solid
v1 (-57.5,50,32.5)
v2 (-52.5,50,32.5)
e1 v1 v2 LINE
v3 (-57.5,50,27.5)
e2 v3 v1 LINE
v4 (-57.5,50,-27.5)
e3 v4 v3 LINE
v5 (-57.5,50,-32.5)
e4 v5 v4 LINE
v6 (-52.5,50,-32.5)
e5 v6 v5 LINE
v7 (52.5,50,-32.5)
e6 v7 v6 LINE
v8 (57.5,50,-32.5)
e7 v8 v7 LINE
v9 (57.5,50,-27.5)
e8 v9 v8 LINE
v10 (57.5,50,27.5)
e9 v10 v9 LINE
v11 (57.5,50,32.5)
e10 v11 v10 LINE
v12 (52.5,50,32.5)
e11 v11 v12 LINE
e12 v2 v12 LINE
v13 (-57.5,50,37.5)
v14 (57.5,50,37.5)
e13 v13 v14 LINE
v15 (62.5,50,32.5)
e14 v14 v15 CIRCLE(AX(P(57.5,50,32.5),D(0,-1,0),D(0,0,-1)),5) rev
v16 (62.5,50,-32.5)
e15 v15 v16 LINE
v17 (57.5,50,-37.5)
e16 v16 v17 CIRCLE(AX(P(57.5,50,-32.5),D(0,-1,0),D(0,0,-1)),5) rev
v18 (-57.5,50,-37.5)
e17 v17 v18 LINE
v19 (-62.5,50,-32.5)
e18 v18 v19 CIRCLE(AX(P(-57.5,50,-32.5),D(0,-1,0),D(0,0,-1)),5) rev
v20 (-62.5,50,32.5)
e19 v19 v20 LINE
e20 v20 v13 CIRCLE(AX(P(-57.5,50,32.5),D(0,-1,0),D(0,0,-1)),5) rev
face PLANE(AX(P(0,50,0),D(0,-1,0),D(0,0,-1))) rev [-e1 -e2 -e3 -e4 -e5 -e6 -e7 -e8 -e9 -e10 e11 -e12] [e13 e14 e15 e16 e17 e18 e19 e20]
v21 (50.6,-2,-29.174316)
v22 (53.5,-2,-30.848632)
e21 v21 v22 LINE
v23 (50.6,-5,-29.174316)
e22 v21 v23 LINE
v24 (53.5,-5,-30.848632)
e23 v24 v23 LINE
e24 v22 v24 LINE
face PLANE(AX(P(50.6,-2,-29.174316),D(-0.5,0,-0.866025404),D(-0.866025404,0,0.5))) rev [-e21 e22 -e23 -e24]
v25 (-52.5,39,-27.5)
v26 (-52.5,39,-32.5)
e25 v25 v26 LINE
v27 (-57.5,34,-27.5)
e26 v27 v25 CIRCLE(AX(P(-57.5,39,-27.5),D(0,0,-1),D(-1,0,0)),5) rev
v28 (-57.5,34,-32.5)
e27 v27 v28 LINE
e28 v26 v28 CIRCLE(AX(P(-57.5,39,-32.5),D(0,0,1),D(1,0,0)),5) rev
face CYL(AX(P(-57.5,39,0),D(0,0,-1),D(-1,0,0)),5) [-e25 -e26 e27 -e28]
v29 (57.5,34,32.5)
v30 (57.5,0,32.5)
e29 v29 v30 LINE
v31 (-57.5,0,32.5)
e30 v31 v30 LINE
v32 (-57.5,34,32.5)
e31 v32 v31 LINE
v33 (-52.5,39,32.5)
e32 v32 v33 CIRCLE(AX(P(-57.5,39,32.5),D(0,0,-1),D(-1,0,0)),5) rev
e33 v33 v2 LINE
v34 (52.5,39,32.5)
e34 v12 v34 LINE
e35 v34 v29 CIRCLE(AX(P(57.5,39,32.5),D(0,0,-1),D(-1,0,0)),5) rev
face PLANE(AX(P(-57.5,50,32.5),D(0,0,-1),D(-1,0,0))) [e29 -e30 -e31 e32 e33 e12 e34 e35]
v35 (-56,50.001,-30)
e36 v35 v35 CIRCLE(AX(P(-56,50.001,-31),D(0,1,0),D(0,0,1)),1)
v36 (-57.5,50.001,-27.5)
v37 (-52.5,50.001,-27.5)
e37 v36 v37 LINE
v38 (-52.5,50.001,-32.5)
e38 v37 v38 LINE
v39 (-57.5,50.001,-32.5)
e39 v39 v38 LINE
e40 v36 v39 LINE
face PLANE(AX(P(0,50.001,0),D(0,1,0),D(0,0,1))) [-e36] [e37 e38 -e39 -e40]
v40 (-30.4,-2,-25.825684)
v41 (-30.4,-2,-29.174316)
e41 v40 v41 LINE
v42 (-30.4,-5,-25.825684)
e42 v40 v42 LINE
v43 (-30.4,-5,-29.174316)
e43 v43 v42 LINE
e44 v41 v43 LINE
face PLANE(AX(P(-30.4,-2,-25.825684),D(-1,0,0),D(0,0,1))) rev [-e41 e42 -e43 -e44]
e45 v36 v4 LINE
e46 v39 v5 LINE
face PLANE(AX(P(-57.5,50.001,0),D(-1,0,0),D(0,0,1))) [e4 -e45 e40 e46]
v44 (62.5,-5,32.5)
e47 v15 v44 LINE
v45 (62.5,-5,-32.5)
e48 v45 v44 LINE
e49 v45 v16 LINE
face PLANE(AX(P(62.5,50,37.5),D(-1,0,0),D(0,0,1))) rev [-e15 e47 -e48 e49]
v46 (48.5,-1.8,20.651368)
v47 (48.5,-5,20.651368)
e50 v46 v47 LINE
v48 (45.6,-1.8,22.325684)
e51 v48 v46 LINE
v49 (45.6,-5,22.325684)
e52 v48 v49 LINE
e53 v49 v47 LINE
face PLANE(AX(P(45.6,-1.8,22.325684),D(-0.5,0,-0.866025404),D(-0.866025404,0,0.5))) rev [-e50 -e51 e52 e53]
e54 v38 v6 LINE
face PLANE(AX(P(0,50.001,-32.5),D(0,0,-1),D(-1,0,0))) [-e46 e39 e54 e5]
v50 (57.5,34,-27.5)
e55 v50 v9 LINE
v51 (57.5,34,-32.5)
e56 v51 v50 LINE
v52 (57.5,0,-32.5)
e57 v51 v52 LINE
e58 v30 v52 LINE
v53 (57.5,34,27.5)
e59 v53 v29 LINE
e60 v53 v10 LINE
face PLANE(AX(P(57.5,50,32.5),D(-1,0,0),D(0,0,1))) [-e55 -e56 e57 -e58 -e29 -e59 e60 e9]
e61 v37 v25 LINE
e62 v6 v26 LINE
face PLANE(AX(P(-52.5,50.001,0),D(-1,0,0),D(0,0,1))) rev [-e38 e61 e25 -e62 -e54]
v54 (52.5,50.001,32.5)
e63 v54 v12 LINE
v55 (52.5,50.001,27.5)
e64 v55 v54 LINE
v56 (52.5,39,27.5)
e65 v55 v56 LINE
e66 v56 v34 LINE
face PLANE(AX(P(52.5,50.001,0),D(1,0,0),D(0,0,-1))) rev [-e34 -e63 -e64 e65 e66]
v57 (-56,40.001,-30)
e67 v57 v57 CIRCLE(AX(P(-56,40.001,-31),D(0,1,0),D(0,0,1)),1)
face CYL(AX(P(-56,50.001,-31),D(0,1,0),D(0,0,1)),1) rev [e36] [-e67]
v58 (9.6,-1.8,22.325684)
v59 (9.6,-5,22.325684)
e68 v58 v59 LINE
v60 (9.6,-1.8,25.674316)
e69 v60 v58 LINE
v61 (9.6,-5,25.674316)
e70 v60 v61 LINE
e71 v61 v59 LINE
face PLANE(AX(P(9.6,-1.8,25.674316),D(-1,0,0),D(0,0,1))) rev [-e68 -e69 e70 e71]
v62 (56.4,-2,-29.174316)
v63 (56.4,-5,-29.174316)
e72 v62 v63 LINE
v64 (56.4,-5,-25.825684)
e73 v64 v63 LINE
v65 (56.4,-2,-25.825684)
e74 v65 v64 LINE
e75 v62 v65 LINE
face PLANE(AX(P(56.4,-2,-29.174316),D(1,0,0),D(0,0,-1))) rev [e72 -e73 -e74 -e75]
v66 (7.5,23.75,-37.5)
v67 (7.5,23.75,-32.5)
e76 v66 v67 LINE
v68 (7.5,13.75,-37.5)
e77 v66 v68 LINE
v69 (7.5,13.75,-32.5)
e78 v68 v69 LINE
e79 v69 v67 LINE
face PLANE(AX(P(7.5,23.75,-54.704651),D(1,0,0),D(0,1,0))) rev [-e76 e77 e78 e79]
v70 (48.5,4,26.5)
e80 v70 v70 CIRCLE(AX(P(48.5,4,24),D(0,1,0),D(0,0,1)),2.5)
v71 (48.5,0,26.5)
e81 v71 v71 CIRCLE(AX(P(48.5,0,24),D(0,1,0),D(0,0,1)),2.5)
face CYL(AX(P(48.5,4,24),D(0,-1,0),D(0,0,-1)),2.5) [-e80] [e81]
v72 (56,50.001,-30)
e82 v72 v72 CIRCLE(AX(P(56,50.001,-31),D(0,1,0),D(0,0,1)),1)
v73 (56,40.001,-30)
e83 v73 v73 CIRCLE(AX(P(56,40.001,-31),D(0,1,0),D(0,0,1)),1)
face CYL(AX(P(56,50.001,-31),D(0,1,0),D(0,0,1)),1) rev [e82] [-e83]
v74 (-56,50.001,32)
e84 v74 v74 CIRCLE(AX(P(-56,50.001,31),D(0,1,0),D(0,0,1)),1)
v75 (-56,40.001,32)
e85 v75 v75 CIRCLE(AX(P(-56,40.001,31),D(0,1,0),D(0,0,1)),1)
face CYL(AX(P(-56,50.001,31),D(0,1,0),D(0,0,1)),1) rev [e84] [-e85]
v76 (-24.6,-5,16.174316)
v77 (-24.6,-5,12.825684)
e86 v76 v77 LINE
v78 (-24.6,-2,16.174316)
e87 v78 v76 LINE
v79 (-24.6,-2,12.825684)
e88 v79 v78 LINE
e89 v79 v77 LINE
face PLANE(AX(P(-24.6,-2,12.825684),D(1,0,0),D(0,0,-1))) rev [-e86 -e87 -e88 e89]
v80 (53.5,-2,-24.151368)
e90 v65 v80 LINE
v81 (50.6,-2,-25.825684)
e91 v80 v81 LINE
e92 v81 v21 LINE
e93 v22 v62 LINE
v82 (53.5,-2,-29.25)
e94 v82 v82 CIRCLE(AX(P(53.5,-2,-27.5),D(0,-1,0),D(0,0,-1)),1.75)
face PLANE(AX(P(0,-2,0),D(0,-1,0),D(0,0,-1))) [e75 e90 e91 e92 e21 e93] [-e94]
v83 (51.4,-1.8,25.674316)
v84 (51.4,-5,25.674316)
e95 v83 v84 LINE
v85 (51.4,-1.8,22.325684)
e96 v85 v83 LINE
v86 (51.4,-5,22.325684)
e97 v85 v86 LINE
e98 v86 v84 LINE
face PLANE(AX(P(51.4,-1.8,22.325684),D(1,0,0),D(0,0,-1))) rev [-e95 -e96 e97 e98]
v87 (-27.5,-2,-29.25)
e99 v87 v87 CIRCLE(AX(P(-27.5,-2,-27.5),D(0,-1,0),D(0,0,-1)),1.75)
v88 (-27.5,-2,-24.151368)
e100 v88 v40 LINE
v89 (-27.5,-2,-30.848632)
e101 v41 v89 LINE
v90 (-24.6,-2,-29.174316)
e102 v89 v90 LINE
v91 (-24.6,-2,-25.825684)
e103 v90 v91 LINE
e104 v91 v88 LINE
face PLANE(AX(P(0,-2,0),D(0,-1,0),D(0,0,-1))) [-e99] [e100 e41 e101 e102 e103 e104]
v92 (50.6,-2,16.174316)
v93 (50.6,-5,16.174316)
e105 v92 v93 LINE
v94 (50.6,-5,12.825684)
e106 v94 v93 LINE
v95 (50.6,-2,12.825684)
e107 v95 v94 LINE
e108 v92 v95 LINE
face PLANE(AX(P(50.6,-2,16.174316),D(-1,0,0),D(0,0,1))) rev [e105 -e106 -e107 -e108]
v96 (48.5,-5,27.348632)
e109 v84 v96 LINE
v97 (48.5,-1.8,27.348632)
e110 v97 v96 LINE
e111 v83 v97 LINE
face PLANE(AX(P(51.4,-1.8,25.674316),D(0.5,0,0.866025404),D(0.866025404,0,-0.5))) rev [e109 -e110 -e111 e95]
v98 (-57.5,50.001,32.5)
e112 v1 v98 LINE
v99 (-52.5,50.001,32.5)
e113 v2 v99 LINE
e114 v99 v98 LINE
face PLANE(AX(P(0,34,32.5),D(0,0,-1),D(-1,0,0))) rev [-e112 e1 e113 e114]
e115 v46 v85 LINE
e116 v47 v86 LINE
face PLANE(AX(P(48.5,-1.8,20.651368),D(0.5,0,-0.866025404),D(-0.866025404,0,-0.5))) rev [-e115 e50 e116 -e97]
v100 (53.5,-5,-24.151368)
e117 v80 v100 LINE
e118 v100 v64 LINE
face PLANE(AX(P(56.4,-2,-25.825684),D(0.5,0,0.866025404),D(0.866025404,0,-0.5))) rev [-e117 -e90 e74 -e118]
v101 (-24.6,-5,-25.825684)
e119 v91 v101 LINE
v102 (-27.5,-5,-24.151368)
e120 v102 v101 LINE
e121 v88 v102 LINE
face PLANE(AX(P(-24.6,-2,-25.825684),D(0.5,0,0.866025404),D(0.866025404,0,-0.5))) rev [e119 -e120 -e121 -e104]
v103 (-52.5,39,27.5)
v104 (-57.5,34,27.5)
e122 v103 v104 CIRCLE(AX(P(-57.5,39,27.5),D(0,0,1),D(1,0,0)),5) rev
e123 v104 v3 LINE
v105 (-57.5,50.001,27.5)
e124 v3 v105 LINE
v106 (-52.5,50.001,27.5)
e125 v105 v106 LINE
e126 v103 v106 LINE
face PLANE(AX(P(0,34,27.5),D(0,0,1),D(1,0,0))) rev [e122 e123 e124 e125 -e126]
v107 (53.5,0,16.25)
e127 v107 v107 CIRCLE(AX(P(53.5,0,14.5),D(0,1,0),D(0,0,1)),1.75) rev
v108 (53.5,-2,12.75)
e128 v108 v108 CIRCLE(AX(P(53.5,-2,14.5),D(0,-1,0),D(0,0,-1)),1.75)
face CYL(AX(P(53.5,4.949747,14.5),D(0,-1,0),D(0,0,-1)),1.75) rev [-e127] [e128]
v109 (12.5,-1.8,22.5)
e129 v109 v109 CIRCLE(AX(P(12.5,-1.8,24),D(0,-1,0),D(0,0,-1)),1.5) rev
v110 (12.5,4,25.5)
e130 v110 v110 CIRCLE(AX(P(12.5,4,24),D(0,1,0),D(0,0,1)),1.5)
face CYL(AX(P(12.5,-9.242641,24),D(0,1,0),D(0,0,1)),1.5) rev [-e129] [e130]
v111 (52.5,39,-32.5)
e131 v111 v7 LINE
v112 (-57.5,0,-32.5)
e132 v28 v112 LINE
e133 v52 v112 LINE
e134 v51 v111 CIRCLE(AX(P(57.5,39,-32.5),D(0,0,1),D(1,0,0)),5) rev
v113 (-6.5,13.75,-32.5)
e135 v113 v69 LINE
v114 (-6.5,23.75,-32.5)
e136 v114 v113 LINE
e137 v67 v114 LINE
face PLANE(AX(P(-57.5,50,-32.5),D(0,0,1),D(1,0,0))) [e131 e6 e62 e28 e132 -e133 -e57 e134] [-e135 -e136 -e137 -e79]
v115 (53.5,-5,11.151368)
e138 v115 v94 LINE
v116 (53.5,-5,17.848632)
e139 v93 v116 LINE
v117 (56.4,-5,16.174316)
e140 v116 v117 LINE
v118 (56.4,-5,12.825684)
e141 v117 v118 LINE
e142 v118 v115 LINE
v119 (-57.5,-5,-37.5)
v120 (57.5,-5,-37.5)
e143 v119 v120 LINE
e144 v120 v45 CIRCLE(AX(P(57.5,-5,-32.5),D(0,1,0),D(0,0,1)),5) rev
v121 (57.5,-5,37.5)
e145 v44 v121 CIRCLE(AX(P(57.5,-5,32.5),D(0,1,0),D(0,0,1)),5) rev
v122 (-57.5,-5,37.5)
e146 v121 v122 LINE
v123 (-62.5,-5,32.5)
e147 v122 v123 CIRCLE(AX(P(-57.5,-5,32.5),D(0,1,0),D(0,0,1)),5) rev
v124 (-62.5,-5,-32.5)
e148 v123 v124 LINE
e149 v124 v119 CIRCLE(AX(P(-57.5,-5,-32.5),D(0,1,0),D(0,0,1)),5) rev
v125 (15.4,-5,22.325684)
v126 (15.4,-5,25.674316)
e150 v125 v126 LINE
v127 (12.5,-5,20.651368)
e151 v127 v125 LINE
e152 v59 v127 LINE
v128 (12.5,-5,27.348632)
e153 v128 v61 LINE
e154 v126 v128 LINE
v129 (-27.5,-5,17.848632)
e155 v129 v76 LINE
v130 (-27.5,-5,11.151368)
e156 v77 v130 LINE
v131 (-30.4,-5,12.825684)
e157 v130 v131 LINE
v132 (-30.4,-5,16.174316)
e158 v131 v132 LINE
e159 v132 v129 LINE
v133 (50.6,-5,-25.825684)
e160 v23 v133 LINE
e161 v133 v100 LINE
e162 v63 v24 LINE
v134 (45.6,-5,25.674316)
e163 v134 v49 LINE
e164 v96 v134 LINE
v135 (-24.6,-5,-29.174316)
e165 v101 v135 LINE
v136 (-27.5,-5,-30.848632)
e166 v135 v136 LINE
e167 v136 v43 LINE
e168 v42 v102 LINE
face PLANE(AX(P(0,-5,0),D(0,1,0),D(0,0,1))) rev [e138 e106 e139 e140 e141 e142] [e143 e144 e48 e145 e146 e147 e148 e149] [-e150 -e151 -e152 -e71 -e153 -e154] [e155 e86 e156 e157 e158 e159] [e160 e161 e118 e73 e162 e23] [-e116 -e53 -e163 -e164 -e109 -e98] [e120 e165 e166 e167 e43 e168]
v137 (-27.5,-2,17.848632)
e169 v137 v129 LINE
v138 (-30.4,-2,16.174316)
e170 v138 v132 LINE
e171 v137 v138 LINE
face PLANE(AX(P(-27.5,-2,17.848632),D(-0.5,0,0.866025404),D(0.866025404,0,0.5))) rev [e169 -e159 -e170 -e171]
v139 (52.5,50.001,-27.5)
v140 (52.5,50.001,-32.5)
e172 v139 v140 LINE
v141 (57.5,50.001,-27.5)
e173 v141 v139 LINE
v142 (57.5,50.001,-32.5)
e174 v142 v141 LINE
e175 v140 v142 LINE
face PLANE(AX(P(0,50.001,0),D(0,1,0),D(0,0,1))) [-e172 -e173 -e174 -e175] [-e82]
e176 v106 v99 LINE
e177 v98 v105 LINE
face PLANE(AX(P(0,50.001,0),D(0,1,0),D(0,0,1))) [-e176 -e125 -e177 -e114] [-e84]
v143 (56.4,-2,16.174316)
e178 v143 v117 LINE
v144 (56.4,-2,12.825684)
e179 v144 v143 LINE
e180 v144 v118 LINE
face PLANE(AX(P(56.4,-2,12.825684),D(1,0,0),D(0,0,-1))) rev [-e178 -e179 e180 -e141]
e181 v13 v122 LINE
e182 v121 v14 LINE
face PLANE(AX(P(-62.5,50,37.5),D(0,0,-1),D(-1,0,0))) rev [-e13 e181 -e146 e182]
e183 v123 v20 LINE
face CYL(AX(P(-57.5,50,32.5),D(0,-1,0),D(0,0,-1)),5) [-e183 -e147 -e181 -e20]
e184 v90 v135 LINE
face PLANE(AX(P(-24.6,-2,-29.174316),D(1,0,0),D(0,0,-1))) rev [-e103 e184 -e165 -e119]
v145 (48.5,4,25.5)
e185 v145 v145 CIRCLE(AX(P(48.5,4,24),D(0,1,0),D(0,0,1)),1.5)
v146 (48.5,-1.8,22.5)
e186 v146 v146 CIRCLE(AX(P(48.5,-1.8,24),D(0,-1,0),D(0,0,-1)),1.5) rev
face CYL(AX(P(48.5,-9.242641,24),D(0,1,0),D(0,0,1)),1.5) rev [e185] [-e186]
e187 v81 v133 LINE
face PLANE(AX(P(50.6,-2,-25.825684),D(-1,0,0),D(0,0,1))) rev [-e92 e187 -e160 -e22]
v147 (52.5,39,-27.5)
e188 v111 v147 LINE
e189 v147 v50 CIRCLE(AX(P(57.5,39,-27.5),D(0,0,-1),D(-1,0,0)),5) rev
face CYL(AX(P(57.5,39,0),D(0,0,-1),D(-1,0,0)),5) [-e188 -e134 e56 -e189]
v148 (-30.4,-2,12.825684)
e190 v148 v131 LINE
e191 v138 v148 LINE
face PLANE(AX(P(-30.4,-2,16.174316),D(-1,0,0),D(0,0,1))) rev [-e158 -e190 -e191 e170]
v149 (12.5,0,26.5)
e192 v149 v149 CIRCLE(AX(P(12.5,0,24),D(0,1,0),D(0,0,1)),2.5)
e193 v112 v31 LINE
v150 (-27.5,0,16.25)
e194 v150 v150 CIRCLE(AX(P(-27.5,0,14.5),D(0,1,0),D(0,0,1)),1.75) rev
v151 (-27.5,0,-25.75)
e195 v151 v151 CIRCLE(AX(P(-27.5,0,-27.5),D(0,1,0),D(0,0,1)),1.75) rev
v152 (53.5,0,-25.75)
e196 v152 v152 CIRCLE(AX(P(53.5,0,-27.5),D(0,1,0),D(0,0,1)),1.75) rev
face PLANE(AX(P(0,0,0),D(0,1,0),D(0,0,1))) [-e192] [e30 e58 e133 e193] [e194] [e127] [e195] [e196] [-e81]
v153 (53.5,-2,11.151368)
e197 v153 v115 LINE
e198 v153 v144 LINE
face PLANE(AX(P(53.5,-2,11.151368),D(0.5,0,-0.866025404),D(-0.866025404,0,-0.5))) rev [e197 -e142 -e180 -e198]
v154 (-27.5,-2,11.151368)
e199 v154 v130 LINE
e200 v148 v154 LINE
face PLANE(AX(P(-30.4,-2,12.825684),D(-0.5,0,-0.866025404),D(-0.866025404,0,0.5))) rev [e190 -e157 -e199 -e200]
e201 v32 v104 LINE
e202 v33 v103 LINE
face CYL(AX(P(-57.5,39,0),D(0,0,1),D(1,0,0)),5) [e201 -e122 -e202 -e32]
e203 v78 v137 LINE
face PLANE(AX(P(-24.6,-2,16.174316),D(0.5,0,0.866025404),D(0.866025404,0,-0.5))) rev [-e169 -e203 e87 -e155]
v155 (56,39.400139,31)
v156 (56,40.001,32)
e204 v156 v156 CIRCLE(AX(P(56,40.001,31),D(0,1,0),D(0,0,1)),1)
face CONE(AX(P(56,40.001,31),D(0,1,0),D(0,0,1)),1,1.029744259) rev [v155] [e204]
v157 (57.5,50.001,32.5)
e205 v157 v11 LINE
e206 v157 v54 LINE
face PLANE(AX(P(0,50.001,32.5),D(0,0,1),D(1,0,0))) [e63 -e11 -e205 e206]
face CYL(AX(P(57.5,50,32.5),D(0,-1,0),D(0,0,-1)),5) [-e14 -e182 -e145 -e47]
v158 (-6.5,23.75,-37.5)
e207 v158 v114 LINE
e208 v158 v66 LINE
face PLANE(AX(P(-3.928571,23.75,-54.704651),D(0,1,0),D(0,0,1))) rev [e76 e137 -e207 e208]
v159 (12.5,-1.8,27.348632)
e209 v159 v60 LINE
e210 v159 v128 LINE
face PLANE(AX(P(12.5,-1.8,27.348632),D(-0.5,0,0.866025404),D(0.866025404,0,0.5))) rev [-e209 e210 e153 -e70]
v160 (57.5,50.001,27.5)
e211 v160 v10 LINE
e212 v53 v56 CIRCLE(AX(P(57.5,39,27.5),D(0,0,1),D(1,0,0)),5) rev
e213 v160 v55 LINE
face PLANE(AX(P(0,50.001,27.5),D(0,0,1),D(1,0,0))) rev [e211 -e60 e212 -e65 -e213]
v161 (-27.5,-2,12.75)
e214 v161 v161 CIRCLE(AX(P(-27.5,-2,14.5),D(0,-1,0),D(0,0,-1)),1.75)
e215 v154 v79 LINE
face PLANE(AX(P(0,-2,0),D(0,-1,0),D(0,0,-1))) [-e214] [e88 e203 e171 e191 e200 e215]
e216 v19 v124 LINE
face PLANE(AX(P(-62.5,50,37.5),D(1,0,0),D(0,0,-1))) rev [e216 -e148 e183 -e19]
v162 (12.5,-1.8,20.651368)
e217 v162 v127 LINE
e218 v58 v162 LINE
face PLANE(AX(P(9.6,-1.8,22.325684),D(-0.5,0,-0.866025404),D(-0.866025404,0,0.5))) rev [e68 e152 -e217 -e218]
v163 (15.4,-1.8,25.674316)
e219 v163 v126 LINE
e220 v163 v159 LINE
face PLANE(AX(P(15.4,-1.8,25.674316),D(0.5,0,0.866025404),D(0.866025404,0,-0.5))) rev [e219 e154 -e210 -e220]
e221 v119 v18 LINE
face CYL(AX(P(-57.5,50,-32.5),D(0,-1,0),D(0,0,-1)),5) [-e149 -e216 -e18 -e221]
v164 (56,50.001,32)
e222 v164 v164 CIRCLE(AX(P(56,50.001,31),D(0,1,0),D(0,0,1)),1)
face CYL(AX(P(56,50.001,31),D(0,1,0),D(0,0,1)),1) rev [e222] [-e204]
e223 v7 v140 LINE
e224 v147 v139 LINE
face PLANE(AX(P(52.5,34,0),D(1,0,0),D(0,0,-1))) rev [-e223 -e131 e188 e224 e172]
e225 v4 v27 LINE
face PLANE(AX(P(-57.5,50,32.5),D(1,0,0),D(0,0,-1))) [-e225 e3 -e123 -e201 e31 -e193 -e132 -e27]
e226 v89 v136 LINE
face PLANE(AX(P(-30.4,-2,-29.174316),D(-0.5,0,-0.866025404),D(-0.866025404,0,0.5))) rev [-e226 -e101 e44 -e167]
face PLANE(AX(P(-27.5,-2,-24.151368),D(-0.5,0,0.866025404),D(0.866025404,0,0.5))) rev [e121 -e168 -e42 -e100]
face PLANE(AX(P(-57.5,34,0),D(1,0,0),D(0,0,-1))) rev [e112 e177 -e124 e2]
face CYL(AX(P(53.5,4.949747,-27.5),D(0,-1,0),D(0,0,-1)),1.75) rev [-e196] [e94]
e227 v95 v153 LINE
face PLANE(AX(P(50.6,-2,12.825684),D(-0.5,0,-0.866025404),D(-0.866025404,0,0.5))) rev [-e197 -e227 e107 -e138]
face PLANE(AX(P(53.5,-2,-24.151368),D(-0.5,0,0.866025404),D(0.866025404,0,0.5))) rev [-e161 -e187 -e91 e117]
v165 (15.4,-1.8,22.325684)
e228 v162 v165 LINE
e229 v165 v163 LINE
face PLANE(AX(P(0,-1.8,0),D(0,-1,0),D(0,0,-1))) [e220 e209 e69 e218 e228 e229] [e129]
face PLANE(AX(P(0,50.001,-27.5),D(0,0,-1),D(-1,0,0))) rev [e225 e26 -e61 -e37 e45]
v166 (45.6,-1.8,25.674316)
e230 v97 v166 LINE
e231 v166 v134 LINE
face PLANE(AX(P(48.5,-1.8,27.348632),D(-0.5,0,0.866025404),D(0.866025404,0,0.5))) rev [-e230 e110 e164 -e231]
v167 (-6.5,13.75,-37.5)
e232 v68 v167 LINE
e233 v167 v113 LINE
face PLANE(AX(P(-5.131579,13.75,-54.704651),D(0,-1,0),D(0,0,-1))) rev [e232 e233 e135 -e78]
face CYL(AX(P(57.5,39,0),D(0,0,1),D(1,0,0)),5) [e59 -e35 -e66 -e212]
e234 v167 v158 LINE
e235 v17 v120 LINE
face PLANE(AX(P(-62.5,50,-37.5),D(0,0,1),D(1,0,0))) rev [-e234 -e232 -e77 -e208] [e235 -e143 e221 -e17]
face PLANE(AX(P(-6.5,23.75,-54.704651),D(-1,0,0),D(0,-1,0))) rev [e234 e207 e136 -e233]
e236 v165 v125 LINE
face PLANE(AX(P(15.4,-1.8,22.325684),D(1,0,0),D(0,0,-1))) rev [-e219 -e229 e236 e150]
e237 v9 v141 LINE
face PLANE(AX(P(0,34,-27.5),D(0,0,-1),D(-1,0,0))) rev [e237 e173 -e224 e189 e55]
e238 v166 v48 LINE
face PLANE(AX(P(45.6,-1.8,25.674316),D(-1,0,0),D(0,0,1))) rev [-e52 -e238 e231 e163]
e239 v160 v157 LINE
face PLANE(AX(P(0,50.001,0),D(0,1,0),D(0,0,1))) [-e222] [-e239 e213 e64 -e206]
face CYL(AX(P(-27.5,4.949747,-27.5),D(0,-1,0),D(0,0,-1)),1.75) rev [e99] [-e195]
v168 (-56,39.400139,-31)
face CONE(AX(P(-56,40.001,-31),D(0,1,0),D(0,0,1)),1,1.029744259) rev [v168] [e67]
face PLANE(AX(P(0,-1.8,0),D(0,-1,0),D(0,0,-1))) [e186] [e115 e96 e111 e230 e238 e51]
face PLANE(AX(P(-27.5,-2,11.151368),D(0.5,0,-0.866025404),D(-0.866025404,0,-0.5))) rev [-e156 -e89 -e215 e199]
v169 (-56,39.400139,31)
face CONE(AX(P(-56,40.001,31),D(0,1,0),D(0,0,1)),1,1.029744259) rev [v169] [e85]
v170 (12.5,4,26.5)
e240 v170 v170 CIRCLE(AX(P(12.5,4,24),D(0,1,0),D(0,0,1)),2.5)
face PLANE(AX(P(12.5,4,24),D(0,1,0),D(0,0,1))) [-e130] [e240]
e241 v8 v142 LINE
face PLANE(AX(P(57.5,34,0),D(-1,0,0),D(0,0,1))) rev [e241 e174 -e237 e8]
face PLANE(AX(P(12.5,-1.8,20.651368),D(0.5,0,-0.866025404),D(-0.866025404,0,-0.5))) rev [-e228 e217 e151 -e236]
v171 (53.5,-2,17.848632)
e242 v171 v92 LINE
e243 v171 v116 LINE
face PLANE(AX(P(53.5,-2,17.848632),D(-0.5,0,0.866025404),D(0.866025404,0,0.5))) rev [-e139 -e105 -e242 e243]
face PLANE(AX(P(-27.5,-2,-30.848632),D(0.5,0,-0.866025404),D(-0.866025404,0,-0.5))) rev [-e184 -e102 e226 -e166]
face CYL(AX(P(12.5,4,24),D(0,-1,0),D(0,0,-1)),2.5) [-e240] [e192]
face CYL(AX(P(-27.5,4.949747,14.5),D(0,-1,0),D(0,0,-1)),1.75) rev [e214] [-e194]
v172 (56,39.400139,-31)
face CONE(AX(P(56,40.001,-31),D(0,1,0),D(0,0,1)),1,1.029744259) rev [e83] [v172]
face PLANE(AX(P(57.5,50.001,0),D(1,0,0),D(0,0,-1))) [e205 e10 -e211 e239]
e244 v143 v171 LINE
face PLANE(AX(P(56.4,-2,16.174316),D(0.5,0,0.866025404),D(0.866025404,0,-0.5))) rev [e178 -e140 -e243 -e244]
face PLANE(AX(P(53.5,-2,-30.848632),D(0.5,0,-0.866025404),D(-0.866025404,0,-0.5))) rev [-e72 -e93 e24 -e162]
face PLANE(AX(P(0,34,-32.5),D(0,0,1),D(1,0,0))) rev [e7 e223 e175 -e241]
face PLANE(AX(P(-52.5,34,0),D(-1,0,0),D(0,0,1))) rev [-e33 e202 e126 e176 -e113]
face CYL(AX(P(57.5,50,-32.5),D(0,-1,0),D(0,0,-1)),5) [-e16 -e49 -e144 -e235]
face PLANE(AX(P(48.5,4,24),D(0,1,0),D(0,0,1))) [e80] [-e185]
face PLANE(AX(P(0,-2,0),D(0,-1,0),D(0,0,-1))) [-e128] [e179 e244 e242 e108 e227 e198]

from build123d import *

# Parameters (mm, degrees)
CROQUIS1_W                        = 125
CROQUIS1_H                        = 75
CROQUIS1_W_2                      = 115
CROQUIS1_H_2                      = 65
SALIENTE_EXTRUIR1_DEPTH           = 50
CROQUIS2_W                        = 125
CROQUIS2_H                        = 75
SALIENTE_EXTRUIR2_DEPTH           = 5
REDONDEO1_R                       = 5
SALIENTE_EXTRUIR3_DEPTH           = 10
CORTAR_EXTRUIR1_DEPTH             = 8
CROQUIS6_R                        = 1.75
CORTAR_EXTRUIR4_DEPTH             = 2
CORTAR_EXTRUIR5_DEPTH             = 5
SALIENTE_EXTRUIR4_DEPTH           = 0.001
SALIENTE_EXTRUIR4_DEPTH_BACK      = 16
CROQUIS8_W                        = 5
CROQUIS8_H                        = 5
REDONDEO2_R                       = 5
DI_METRO_DE_TALADRO_2_0_2_4_D     = 2
DI_METRO_DE_TALADRO_2_0_2_4_DEPTH = 10
DI_METRO_DE_TALADRO_2_0_2_4_TIP   = 0.600860619
CROQUIS11_R                       = 2.5
SALIENTE_EXTRUIR5_DEPTH           = 4
CROQUIS13_R                       = 1.5
CORTAR_EXTRUIR6_DEPTH             = 9
CORTAR_EXTRUIR7_DEPTH             = 3.2


with BuildPart() as part:
    # Croquis1 → Saliente-Extruir1 (new body)
    with BuildSketch(Plane(origin=(0, 0, 0), x_dir=(1, 0, 0), z_dir=(0, 1, 0))):
        Rectangle(CROQUIS1_W, CROQUIS1_H)
        Rectangle(CROQUIS1_W_2, CROQUIS1_H_2, mode=Mode.SUBTRACT)
    extrude(amount=SALIENTE_EXTRUIR1_DEPTH)

    # Croquis2 → Saliente-Extruir2 (add)
    with BuildSketch(Plane.XZ):
        Rectangle(CROQUIS2_W, CROQUIS2_H)
    extrude(amount=SALIENTE_EXTRUIR2_DEPTH)

    # Redondeo1
    redondeo1_edges = [part.edges().sort_by_distance(p)[0] for p in [
        (62.5, 22.5, 37.5),
        (-62.5, 22.5, 37.5),
        (-62.5, 22.5, -37.5),
        (62.5, 22.5, -37.5),
    ]]
    fillet(redondeo1_edges, radius=REDONDEO1_R)

    # Croquis3 → Saliente-Extruir3 (add)
    with BuildSketch(Plane(origin=(0, 0, 0), x_dir=(1, 0, 0), z_dir=(0, 1, 0))):
        Polygon((53.5, 24.151368439), (56.4, 25.825684219), (56.4, 29.174315781), (53.5, 30.848631561), (50.6, 29.174315781), (50.6, 25.825684219), align=None)
        Polygon((-24.6, 25.825684219), (-27.5, 24.151368439), (-30.4, 25.825684219), (-30.4, 29.174315781), (-27.5, 30.848631561), (-24.6, 29.174315781), align=None)
        Polygon((-24.6, -16.174315781), (-24.6, -12.825684219), (-27.5, -11.151368439), (-30.4, -12.825684219), (-30.4, -16.174315781), (-27.5, -17.848631561), align=None)
        Polygon((50.6, -12.825684219), (53.5, -11.151368439), (56.4, -12.825684219), (56.4, -16.174315781), (53.5, -17.848631561), (50.6, -16.174315781), align=None)
    extrude(amount=-SALIENTE_EXTRUIR3_DEPTH)

    # Croquis4 → Cortar-Extruir1 (cut)
    with BuildSketch(Plane.XZ.offset(10)):
        Polygon((53.5, -24.151368439), (50.6, -25.825684219), (50.6, -29.174315781), (53.5, -30.848631561), (56.4, -29.174315781), (56.4, -25.825684219), align=None)
        Polygon((50.6, 16.174315781), (50.6, 12.825684219), (53.5, 11.151368439), (56.4, 12.825684219), (56.4, 16.174315781), (53.5, 17.848631561), align=None)
        Polygon((-24.6, 16.174315781), (-27.5, 17.848631561), (-30.4, 16.174315781), (-30.4, 12.825684219), (-27.5, 11.151368439), (-24.6, 12.825684219), align=None)
        Polygon((-24.6, -29.174315781), (-24.6, -25.825684219), (-27.5, -24.151368439), (-30.4, -25.825684219), (-30.4, -29.174315781), (-27.5, -30.848631561), align=None)
    extrude(amount=-CORTAR_EXTRUIR1_DEPTH, mode=Mode.SUBTRACT)

    # Croquis6 → Cortar-Extruir4 (cut)
    with BuildSketch(Plane.XZ.offset(2)):
        with Locations(Location((53.5, -27.5, 0), (0, 0, 270))):
            Circle(CROQUIS6_R)
        with Locations(Location((-27.5, -27.5, 0), (0, 0, 270))):
            Circle(CROQUIS6_R)
        with Locations(Location((-27.5, 14.5, 0), (0, 0, 270))):
            Circle(CROQUIS6_R)
        with Locations(Location((53.5, 14.5, 0), (0, 0, 270))):
            Circle(CROQUIS6_R)
    extrude(amount=-CORTAR_EXTRUIR4_DEPTH, mode=Mode.SUBTRACT)

    # Croquis7 → Cortar-Extruir5 (cut)
    with BuildSketch(Plane.XY.offset(-32.5)):
        Polygon((-3.928571429, 23.75), (7.5, 23.75), (7.5, 13.75), (-5.131578947, 13.75), (-6.5, 13.75), (-6.5, 23.75), align=None)
    extrude(amount=-CORTAR_EXTRUIR5_DEPTH, mode=Mode.SUBTRACT)

    # Croquis8 → Saliente-Extruir4 (add, two sides: drawn at the far end of the back side and taken through both)
    with BuildSketch(Plane(origin=(0, 50, 0), x_dir=(1, 0, 0), z_dir=(0, 1, 0)).offset(-SALIENTE_EXTRUIR4_DEPTH_BACK)):
        with Locations((-55, -30)):
            Rectangle(CROQUIS8_W, CROQUIS8_H)
        with Locations((55, -30)):
            Rectangle(CROQUIS8_W, CROQUIS8_H)
        with Locations((55, 30)):
            Rectangle(CROQUIS8_W, CROQUIS8_H)
        with Locations((-55, 30)):
            Rectangle(CROQUIS8_W, CROQUIS8_H)
    extrude(amount=SALIENTE_EXTRUIR4_DEPTH + SALIENTE_EXTRUIR4_DEPTH_BACK)

    # Redondeo2
    redondeo2_edges = [part.edges().sort_by_distance(p)[0] for p in [
        (-52.5, 34, -30),
        (-52.5, 34, 30),
        (52.5, 34, 30),
        (52.5, 34, -30),
    ]]
    fillet(redondeo2_edges, radius=REDONDEO2_R - 0.0001)  # a hair under: the kernel refuses the full size

    # Diámetro de taladro Ø2.0 (2)4
    with Locations(Plane(origin=(-56, 50.001, -31), x_dir=(0, 0, 1), z_dir=(0, 1, 0))):
        with Locations((0, 0), (0, 112), (62, 112), (62, 0)):
            Hole(DI_METRO_DE_TALADRO_2_0_2_4_D / 2, depth=DI_METRO_DE_TALADRO_2_0_2_4_DEPTH)
            with Locations((0, 0, -(DI_METRO_DE_TALADRO_2_0_2_4_DEPTH + DI_METRO_DE_TALADRO_2_0_2_4_TIP / 2))):  # 118° drill point
                Cone(0, DI_METRO_DE_TALADRO_2_0_2_4_D / 2, DI_METRO_DE_TALADRO_2_0_2_4_TIP, mode=Mode.SUBTRACT)

    # Croquis11 → Saliente-Extruir5 (add)
    with BuildSketch(Plane(origin=(0, 0, 0), x_dir=(1, 0, 0), z_dir=(0, 1, 0))):
        with Locations(Location((12.5, -24, 0), (0, 0, 270))):
            Circle(CROQUIS11_R)
        with Locations(Location((48.5, -24, 0), (0, 0, 270))):
            Circle(CROQUIS11_R)
    extrude(amount=SALIENTE_EXTRUIR5_DEPTH)

    # Croquis13 → Cortar-Extruir6 (cut)
    with BuildSketch(Plane(origin=(0, 4, 0), x_dir=(1, 0, 0), z_dir=(0, 1, 0))):
        with Locations(Location((12.5, -24, 0), (0, 0, 270))):
            Circle(CROQUIS13_R)
        with Locations(Location((48.5, -24, 0), (0, 0, 270))):
            Circle(CROQUIS13_R)
    extrude(amount=-CORTAR_EXTRUIR6_DEPTH, mode=Mode.SUBTRACT)

    # Croquis14 → Cortar-Extruir7 (cut)
    with BuildSketch(Plane.XZ.offset(5)):
        Polygon((12.5, 20.651368439), (15.4, 22.325684219), (15.4, 25.674315781), (12.5, 27.348631561), (9.6, 25.674315781), (9.6, 22.325684219), align=None)
        Polygon((48.5, 20.651368439), (51.4, 22.325684219), (51.4, 25.674315781), (48.5, 27.348631561), (45.6, 25.674315781), (45.6, 22.325684219), align=None)
    extrude(amount=-CORTAR_EXTRUIR7_DEPTH, mode=Mode.SUBTRACT)


solid = part.part
